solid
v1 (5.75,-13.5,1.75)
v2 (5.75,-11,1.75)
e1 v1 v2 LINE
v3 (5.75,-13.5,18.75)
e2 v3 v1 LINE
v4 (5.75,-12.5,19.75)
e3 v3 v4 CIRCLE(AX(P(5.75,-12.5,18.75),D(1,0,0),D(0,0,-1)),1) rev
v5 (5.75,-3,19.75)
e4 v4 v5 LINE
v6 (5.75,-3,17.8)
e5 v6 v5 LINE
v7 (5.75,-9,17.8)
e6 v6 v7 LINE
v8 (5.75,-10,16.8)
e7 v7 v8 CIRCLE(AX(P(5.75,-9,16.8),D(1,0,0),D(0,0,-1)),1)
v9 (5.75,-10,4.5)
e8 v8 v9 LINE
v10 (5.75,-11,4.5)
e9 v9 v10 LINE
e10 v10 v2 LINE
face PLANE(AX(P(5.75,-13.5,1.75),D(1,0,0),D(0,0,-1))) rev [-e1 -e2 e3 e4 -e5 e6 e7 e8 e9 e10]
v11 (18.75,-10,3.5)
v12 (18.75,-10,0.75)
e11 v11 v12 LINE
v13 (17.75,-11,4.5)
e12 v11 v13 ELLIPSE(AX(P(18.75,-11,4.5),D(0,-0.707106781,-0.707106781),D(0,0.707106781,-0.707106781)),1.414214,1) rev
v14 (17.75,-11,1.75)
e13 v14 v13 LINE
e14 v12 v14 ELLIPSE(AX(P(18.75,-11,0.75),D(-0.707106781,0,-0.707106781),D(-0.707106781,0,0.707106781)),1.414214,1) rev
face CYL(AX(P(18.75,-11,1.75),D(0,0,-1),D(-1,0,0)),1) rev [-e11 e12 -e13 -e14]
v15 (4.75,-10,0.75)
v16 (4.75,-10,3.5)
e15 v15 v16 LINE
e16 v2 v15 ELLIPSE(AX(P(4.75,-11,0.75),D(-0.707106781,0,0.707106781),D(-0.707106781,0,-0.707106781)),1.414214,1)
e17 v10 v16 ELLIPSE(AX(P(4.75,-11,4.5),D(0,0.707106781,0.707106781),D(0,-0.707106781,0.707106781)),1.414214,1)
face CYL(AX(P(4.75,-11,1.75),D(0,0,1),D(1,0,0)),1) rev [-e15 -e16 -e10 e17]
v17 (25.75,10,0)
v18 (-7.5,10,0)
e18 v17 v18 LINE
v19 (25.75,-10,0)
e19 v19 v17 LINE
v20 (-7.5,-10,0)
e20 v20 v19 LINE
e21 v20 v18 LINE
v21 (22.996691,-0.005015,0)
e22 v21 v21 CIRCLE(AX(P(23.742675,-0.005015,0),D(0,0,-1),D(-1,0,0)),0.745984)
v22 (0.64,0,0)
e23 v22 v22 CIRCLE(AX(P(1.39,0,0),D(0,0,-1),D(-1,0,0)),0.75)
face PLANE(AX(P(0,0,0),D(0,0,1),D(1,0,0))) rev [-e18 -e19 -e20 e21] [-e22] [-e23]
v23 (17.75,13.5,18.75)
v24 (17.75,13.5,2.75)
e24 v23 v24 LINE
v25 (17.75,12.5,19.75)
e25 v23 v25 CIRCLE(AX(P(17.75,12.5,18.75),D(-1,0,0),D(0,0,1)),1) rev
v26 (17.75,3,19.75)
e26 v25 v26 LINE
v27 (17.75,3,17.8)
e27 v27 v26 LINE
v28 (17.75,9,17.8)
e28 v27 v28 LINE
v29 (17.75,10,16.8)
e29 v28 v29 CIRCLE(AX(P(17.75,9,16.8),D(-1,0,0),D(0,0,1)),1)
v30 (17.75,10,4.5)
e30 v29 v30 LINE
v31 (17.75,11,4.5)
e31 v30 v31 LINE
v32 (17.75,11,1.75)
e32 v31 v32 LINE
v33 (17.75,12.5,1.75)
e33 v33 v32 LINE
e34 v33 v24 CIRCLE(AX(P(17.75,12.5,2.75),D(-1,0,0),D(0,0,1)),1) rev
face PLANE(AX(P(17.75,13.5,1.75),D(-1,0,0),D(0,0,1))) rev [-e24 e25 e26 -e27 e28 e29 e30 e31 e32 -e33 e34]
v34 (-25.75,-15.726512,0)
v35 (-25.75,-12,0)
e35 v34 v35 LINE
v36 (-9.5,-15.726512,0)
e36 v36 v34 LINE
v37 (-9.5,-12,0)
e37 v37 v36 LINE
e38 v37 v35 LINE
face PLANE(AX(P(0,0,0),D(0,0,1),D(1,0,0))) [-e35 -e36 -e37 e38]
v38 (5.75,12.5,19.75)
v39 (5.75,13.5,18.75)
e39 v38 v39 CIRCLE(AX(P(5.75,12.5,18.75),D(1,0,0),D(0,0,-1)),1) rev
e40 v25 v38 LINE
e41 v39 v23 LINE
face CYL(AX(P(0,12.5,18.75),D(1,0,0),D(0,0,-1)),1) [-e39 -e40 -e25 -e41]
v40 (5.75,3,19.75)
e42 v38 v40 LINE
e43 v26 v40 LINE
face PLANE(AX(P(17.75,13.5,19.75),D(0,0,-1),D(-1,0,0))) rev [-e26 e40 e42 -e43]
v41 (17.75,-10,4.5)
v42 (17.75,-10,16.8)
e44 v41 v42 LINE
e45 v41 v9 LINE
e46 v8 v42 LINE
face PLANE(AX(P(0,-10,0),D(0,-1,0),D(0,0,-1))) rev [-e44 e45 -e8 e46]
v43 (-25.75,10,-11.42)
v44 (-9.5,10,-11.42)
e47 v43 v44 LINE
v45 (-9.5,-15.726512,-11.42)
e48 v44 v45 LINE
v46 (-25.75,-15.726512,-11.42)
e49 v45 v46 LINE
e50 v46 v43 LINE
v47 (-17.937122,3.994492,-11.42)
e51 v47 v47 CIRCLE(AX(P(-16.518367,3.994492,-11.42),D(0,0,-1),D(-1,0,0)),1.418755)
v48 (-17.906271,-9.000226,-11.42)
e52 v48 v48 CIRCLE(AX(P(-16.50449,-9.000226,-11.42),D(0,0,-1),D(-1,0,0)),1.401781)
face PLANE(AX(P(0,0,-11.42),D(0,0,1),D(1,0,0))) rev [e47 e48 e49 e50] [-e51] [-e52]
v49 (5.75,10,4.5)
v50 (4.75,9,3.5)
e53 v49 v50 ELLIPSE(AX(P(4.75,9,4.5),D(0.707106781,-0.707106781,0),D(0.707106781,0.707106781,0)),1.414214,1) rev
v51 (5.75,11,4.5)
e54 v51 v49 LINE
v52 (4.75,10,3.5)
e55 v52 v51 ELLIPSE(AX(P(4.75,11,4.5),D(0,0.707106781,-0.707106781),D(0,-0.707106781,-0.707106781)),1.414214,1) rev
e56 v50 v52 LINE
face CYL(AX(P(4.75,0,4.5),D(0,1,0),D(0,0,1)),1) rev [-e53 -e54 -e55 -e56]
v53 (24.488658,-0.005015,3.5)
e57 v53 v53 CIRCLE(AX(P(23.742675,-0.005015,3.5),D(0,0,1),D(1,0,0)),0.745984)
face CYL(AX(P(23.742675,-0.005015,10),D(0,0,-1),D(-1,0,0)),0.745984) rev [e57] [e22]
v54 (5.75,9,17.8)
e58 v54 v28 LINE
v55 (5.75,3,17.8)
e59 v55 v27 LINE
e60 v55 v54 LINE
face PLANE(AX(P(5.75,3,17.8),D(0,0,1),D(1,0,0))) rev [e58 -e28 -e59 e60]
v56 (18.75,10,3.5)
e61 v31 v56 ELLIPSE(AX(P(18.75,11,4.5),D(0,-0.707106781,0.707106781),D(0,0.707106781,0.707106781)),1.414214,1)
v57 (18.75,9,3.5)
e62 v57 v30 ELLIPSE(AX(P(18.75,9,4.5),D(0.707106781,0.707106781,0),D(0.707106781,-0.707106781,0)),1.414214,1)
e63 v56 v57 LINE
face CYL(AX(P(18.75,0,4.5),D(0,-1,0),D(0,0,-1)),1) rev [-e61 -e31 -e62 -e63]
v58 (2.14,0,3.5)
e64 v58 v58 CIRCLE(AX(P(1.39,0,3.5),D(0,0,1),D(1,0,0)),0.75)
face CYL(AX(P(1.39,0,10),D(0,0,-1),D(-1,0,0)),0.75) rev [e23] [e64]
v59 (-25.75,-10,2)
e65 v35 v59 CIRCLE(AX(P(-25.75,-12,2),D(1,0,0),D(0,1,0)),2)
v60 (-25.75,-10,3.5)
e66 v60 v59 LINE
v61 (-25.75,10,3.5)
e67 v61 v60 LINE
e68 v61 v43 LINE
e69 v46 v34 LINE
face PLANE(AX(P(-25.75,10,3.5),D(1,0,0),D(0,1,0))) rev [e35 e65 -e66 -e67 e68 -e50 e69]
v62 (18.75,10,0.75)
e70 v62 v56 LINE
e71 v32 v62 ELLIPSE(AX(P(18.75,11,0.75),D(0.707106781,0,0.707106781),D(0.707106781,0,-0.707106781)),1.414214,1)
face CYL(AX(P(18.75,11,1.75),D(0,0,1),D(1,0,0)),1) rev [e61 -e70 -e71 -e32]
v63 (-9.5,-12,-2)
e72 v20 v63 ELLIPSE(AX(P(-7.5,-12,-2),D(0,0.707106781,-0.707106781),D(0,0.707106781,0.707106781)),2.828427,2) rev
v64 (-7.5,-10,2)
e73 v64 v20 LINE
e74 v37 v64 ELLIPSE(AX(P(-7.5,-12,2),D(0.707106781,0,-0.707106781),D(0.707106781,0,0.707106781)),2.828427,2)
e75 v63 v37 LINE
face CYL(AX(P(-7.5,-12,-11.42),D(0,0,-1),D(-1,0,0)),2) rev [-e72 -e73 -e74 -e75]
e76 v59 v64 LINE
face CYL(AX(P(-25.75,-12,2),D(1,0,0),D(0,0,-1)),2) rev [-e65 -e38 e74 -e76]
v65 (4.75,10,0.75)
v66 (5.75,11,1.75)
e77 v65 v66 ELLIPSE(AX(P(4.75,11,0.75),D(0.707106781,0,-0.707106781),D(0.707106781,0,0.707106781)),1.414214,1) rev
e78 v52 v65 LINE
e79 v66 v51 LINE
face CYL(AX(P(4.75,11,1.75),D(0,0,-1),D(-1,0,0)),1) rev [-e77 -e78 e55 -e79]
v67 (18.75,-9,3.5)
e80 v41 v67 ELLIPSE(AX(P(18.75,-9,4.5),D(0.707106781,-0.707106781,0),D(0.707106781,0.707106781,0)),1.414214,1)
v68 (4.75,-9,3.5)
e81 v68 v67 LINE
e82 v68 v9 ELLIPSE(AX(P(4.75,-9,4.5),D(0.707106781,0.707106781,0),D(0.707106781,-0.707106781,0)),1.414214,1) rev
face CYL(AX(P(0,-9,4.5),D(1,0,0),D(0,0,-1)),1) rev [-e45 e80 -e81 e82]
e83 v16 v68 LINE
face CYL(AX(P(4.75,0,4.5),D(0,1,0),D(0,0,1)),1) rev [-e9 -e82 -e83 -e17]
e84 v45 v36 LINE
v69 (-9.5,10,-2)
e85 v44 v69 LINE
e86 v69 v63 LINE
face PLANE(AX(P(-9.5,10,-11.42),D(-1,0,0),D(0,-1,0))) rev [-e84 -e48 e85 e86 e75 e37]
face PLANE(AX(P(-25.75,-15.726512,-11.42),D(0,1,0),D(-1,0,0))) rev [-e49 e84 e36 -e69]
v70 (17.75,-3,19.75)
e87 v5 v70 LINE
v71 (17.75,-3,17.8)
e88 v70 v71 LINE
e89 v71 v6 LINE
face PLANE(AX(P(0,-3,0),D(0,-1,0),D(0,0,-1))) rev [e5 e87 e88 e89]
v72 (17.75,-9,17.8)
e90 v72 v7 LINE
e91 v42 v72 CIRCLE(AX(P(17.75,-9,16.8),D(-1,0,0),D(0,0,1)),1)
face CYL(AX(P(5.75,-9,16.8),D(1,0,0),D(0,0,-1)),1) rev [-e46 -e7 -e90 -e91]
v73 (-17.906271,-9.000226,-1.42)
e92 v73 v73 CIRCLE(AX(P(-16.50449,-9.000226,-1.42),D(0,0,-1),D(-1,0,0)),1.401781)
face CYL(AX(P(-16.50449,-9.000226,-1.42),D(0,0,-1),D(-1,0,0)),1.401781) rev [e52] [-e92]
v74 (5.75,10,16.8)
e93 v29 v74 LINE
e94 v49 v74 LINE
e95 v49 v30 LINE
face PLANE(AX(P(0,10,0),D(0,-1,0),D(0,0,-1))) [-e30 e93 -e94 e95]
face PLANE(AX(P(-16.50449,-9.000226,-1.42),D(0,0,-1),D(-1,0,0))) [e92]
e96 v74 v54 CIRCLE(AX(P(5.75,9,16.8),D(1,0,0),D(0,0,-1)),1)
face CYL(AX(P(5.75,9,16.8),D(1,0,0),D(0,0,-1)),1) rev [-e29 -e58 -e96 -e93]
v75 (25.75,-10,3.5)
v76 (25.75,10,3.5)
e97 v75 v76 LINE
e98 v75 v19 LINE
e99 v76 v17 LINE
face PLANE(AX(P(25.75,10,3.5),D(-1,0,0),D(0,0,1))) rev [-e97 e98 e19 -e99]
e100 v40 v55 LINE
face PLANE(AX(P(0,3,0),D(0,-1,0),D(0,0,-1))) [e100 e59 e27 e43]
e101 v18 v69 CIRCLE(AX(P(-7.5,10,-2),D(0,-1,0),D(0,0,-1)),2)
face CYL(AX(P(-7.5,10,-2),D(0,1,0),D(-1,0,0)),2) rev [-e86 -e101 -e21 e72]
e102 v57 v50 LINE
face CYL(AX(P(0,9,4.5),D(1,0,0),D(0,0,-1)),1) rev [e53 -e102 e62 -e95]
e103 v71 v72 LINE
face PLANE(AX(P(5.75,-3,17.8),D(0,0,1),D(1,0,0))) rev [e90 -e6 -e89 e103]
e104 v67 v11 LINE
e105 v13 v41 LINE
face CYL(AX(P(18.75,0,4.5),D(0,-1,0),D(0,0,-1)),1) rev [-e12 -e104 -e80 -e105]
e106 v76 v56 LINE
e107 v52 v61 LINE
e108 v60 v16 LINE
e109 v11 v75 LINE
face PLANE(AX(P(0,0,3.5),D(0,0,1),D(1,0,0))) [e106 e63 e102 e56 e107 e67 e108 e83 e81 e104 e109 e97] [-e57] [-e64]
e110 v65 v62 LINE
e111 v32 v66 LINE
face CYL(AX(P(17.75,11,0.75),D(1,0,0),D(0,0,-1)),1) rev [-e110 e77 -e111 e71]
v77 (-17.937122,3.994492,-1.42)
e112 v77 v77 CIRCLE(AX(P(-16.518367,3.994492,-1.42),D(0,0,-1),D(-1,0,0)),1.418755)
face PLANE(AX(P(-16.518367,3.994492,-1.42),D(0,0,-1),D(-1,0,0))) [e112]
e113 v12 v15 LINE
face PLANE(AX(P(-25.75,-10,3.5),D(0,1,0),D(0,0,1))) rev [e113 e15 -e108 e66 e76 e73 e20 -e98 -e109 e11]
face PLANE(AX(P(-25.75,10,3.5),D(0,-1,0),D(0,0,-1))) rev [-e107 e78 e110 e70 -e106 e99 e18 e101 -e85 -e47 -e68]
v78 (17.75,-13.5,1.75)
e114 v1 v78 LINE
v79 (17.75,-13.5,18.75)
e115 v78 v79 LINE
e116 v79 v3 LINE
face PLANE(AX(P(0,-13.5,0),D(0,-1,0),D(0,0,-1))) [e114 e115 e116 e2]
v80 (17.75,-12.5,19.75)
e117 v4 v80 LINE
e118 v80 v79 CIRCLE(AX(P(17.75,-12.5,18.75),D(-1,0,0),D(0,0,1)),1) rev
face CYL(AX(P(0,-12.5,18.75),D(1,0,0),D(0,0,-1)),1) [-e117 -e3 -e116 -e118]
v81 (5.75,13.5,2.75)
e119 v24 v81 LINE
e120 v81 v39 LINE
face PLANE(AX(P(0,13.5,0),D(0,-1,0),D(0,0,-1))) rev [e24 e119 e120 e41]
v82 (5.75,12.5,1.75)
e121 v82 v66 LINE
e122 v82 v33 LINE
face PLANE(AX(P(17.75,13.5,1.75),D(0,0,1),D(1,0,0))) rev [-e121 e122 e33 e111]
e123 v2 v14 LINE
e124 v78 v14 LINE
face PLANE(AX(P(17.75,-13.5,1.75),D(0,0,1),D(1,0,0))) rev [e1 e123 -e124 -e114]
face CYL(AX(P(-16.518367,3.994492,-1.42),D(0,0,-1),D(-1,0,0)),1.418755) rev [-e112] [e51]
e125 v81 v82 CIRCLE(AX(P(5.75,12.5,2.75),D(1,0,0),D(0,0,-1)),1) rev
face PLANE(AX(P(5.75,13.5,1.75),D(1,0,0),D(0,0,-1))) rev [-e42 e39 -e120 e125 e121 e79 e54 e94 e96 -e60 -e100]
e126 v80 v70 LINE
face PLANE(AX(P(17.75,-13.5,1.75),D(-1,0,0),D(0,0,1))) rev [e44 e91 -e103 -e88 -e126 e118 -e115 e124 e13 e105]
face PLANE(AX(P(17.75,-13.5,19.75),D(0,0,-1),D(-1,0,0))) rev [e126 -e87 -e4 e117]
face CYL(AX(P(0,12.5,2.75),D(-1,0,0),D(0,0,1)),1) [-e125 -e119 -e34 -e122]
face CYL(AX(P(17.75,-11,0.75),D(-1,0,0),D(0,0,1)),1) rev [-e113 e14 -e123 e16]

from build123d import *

# Parameters (mm, degrees)
SKETCH1_W           = 51.5
SKETCH1_H           = 20
BOSS_EXTRUDE1_DEPTH = 3.5
SKETCH2_W           = 12
SKETCH2_H           = 18
BOSS_EXTRUDE2_DEPTH = 3.5
FILLET1_R           = 1
FILLET2_R           = 1
SKETCH3_W           = 12
SKETCH3_H           = 18
BOSS_EXTRUDE3_DEPTH = 3.5
FILLET3_R           = 1
FILLET4_R           = 1
FILLET5_R           = 1
FILLET6_R           = 1
FILLET7_R           = 1
FILLET8_R           = 1
FILLET9_R           = 1
FILLET10_R          = 1
FILLET11_R          = 1
FILLET12_R          = 1
SKETCH4_W           = 12
SKETCH4_H           = 1.95
BOSS_EXTRUDE4_DEPTH = 7
SKETCH5_W           = 12
SKETCH5_H           = 1.95
BOSS_EXTRUDE5_DEPTH = 7
FILLET13_R          = 1
FILLET14_R          = 1
FILLET15_R          = 1
FILLET16_R          = 1
FILLET17_R          = 1
SKETCH8_W           = 16.25
SKETCH8_H           = 25.726511914
BOSS_EXTRUDE6_DEPTH = 11.42
FILLET21_R          = 2
FILLET22_R          = 2
FILLET23_R          = 2
SKETCH9_R           = 0.745983734
CUT_EXTRUDE1_DEPTH  = 10
SKETCH10_R          = 0.75
CUT_EXTRUDE2_DEPTH  = 10
SKETCH11_R          = 1.41875541
CUT_EXTRUDE3_DEPTH  = 10
SKETCH12_R          = 1.401780947
CUT_EXTRUDE4_DEPTH  = 10


with BuildPart() as part:
    # Sketch1 → Boss-Extrude1 (new body)
    with BuildSketch(Plane.XY):
        Rectangle(SKETCH1_W, SKETCH1_H)
    extrude(amount=BOSS_EXTRUDE1_DEPTH)

    # Sketch2 → Boss-Extrude2 (add)
    with BuildSketch(Plane(origin=(0, 10, 0), x_dir=(1, 0, 0), z_dir=(0, 1, 0))):
        with Locations((11.75, -10.75)):
            Rectangle(SKETCH2_W, SKETCH2_H)
    extrude(amount=BOSS_EXTRUDE2_DEPTH)

    # Fillet1
    fillet1_edges = [part.edges().sort_by_distance(p)[0] for p in [
        (11.75, 10, 1.75),
    ]]
    fillet(fillet1_edges, radius=FILLET1_R)

    # Fillet2
    fillet2_edges = [part.edges().sort_by_distance(p)[0] for p in [
        (11.75, 10, 3.5),
    ]]
    fillet(fillet2_edges, radius=FILLET2_R)

    # Sketch3 → Boss-Extrude3 (add)
    with BuildSketch(Plane(origin=(0, -10, 0), x_dir=(-1, 0, 0), z_dir=(0, -1, 0))):
        with Locations((-11.75, -10.75)):
            Rectangle(SKETCH3_W, SKETCH3_H)
    extrude(amount=BOSS_EXTRUDE3_DEPTH)

    # Fillet3
    fillet3_edges = [part.edges().sort_by_distance(p)[0] for p in [
        (11.75, -10, 1.75),
    ]]
    fillet(fillet3_edges, radius=FILLET3_R)

    # Fillet4
    fillet4_edges = [part.edges().sort_by_distance(p)[0] for p in [
        (11.75, -10, 3.5),
    ]]
    fillet(fillet4_edges, radius=FILLET4_R)

    # Fillet5
    fillet5_edges = [part.edges().sort_by_distance(p)[0] for p in [
        (17.75, 10, 2.125),
    ]]
    fillet(fillet5_edges, radius=FILLET5_R)

    # Fillet6
    fillet6_edges = [part.edges().sort_by_distance(p)[0] for p in [
        (5.75, 10, 2.125),
    ]]
    fillet(fillet6_edges, radius=FILLET6_R)

    # Fillet7
    fillet7_edges = [part.edges().sort_by_distance(p)[0] for p in [
        (17.75, 10, 3.5),
    ]]
    fillet(fillet7_edges, radius=FILLET7_R)

    # Fillet8
    fillet8_edges = [part.edges().sort_by_distance(p)[0] for p in [
        (5.75, 10, 3.5),
    ]]
    fillet(fillet8_edges, radius=FILLET8_R)

    # Fillet9
    fillet9_edges = [part.edges().sort_by_distance(p)[0] for p in [
        (5.75, -10, 2.125),
    ]]
    fillet(fillet9_edges, radius=FILLET9_R)

    # Fillet10
    fillet10_edges = [part.edges().sort_by_distance(p)[0] for p in [
        (5.75, -10, 3.5),
    ]]
    fillet(fillet10_edges, radius=FILLET10_R)

    # Fillet11
    fillet11_edges = [part.edges().sort_by_distance(p)[0] for p in [
        (17.75, -10, 2.125),
    ]]
    fillet(fillet11_edges, radius=FILLET11_R)

    # Fillet12
    fillet12_edges = [part.edges().sort_by_distance(p)[0] for p in [
        (17.75, -10, 3.5),
    ]]
    fillet(fillet12_edges, radius=FILLET12_R)

    # Sketch4 → Boss-Extrude4 (add)
    with BuildSketch(Plane(origin=(0, -10, 0), x_dir=(1, 0, 0), z_dir=(0, 1, 0))):
        with Locations((11.75, -18.775)):
            Rectangle(SKETCH4_W, SKETCH4_H)
    extrude(amount=BOSS_EXTRUDE4_DEPTH)

    # Sketch5 → Boss-Extrude5 (add)
    with BuildSketch(Plane(origin=(0, 10, 0), x_dir=(-1, 0, 0), z_dir=(0, -1, 0))):
        with Locations((-11.75, -18.775)):
            Rectangle(SKETCH5_W, SKETCH5_H)
    extrude(amount=BOSS_EXTRUDE5_DEPTH)

    # Fillet13
    fillet13_edges = [part.edges().sort_by_distance(p)[0] for p in [
        (11.75, 10, 17.8),
    ]]
    fillet(fillet13_edges, radius=FILLET13_R)

    # Fillet14
    fillet14_edges = [part.edges().sort_by_distance(p)[0] for p in [
        (11.75, 13.5, 19.75),
    ]]
    fillet(fillet14_edges, radius=FILLET14_R)

    # Fillet15
    fillet15_edges = [part.edges().sort_by_distance(p)[0] for p in [
        (11.75, 13.5, 1.75),
    ]]
    fillet(fillet15_edges, radius=FILLET15_R)

    # Fillet16
    fillet16_edges = [part.edges().sort_by_distance(p)[0] for p in [
        (11.75, -13.5, 19.75),
    ]]
    fillet(fillet16_edges, radius=FILLET16_R)

    # Fillet17
    fillet17_edges = [part.edges().sort_by_distance(p)[0] for p in [
        (11.75, -10, 17.8),
    ]]
    fillet(fillet17_edges, radius=FILLET17_R)

    # Sketch8 → Boss-Extrude6 (add)
    with BuildSketch(Plane(origin=(0, 0, 0), x_dir=(-1, 0, 0), z_dir=(0, 0, -1))):
        with Locations((17.625, -2.863255957)):
            Rectangle(SKETCH8_W, SKETCH8_H)
    extrude(amount=BOSS_EXTRUDE6_DEPTH)

    # Fillet21
    fillet21_edges = [part.edges().sort_by_distance(p)[0] for p in [
        (-9.5, 0, 0),
    ]]
    fillet(fillet21_edges, radius=FILLET21_R)

    # Fillet22
    fillet22_edges = [part.edges().sort_by_distance(p)[0] for p in [
        (-17.625, -10, 0),
    ]]
    fillet(fillet22_edges, radius=FILLET22_R)

    # Fillet23
    fillet23_edges = [part.edges().sort_by_distance(p)[0] for p in [
        (-9.5, -10, 0),
    ]]
    fillet(fillet23_edges, radius=FILLET23_R - 0.0001)  # a hair under: the kernel refuses the full size

    # Sketch9 → Cut-Extrude1 (cut)
    with BuildSketch(Plane(origin=(0, 0, 0), x_dir=(-1, 0, 0), z_dir=(0, 0, -1))):
        with Locations((-23.742674676, -0.005014859)):
            Circle(SKETCH9_R)
    extrude(amount=-CUT_EXTRUDE1_DEPTH, mode=Mode.SUBTRACT)

    # Sketch10 → Cut-Extrude2 (cut)
    with BuildSketch(Plane(origin=(0, 0, 0), x_dir=(-1, 0, 0), z_dir=(0, 0, -1))):
        with Locations((-1.39, 0)):
            Circle(SKETCH10_R)
    extrude(amount=-CUT_EXTRUDE2_DEPTH, mode=Mode.SUBTRACT)

    # Sketch11 → Cut-Extrude3 (cut)
    with BuildSketch(Plane(origin=(0, 0, -11.42), x_dir=(-1, 0, 0), z_dir=(0, 0, -1))):
        with Locations((16.518366767, 3.994492079)):
            Circle(SKETCH11_R)
    extrude(amount=-CUT_EXTRUDE3_DEPTH, mode=Mode.SUBTRACT)

    # Sketch12 → Cut-Extrude4 (cut)
    with BuildSketch(Plane(origin=(0, 0, -11.42), x_dir=(-1, 0, 0), z_dir=(0, 0, -1))):
        with Locations((16.50448956, -9.000225668)):
            Circle(SKETCH12_R)
    extrude(amount=-CUT_EXTRUDE4_DEPTH, mode=Mode.SUBTRACT)


solid = part.part
